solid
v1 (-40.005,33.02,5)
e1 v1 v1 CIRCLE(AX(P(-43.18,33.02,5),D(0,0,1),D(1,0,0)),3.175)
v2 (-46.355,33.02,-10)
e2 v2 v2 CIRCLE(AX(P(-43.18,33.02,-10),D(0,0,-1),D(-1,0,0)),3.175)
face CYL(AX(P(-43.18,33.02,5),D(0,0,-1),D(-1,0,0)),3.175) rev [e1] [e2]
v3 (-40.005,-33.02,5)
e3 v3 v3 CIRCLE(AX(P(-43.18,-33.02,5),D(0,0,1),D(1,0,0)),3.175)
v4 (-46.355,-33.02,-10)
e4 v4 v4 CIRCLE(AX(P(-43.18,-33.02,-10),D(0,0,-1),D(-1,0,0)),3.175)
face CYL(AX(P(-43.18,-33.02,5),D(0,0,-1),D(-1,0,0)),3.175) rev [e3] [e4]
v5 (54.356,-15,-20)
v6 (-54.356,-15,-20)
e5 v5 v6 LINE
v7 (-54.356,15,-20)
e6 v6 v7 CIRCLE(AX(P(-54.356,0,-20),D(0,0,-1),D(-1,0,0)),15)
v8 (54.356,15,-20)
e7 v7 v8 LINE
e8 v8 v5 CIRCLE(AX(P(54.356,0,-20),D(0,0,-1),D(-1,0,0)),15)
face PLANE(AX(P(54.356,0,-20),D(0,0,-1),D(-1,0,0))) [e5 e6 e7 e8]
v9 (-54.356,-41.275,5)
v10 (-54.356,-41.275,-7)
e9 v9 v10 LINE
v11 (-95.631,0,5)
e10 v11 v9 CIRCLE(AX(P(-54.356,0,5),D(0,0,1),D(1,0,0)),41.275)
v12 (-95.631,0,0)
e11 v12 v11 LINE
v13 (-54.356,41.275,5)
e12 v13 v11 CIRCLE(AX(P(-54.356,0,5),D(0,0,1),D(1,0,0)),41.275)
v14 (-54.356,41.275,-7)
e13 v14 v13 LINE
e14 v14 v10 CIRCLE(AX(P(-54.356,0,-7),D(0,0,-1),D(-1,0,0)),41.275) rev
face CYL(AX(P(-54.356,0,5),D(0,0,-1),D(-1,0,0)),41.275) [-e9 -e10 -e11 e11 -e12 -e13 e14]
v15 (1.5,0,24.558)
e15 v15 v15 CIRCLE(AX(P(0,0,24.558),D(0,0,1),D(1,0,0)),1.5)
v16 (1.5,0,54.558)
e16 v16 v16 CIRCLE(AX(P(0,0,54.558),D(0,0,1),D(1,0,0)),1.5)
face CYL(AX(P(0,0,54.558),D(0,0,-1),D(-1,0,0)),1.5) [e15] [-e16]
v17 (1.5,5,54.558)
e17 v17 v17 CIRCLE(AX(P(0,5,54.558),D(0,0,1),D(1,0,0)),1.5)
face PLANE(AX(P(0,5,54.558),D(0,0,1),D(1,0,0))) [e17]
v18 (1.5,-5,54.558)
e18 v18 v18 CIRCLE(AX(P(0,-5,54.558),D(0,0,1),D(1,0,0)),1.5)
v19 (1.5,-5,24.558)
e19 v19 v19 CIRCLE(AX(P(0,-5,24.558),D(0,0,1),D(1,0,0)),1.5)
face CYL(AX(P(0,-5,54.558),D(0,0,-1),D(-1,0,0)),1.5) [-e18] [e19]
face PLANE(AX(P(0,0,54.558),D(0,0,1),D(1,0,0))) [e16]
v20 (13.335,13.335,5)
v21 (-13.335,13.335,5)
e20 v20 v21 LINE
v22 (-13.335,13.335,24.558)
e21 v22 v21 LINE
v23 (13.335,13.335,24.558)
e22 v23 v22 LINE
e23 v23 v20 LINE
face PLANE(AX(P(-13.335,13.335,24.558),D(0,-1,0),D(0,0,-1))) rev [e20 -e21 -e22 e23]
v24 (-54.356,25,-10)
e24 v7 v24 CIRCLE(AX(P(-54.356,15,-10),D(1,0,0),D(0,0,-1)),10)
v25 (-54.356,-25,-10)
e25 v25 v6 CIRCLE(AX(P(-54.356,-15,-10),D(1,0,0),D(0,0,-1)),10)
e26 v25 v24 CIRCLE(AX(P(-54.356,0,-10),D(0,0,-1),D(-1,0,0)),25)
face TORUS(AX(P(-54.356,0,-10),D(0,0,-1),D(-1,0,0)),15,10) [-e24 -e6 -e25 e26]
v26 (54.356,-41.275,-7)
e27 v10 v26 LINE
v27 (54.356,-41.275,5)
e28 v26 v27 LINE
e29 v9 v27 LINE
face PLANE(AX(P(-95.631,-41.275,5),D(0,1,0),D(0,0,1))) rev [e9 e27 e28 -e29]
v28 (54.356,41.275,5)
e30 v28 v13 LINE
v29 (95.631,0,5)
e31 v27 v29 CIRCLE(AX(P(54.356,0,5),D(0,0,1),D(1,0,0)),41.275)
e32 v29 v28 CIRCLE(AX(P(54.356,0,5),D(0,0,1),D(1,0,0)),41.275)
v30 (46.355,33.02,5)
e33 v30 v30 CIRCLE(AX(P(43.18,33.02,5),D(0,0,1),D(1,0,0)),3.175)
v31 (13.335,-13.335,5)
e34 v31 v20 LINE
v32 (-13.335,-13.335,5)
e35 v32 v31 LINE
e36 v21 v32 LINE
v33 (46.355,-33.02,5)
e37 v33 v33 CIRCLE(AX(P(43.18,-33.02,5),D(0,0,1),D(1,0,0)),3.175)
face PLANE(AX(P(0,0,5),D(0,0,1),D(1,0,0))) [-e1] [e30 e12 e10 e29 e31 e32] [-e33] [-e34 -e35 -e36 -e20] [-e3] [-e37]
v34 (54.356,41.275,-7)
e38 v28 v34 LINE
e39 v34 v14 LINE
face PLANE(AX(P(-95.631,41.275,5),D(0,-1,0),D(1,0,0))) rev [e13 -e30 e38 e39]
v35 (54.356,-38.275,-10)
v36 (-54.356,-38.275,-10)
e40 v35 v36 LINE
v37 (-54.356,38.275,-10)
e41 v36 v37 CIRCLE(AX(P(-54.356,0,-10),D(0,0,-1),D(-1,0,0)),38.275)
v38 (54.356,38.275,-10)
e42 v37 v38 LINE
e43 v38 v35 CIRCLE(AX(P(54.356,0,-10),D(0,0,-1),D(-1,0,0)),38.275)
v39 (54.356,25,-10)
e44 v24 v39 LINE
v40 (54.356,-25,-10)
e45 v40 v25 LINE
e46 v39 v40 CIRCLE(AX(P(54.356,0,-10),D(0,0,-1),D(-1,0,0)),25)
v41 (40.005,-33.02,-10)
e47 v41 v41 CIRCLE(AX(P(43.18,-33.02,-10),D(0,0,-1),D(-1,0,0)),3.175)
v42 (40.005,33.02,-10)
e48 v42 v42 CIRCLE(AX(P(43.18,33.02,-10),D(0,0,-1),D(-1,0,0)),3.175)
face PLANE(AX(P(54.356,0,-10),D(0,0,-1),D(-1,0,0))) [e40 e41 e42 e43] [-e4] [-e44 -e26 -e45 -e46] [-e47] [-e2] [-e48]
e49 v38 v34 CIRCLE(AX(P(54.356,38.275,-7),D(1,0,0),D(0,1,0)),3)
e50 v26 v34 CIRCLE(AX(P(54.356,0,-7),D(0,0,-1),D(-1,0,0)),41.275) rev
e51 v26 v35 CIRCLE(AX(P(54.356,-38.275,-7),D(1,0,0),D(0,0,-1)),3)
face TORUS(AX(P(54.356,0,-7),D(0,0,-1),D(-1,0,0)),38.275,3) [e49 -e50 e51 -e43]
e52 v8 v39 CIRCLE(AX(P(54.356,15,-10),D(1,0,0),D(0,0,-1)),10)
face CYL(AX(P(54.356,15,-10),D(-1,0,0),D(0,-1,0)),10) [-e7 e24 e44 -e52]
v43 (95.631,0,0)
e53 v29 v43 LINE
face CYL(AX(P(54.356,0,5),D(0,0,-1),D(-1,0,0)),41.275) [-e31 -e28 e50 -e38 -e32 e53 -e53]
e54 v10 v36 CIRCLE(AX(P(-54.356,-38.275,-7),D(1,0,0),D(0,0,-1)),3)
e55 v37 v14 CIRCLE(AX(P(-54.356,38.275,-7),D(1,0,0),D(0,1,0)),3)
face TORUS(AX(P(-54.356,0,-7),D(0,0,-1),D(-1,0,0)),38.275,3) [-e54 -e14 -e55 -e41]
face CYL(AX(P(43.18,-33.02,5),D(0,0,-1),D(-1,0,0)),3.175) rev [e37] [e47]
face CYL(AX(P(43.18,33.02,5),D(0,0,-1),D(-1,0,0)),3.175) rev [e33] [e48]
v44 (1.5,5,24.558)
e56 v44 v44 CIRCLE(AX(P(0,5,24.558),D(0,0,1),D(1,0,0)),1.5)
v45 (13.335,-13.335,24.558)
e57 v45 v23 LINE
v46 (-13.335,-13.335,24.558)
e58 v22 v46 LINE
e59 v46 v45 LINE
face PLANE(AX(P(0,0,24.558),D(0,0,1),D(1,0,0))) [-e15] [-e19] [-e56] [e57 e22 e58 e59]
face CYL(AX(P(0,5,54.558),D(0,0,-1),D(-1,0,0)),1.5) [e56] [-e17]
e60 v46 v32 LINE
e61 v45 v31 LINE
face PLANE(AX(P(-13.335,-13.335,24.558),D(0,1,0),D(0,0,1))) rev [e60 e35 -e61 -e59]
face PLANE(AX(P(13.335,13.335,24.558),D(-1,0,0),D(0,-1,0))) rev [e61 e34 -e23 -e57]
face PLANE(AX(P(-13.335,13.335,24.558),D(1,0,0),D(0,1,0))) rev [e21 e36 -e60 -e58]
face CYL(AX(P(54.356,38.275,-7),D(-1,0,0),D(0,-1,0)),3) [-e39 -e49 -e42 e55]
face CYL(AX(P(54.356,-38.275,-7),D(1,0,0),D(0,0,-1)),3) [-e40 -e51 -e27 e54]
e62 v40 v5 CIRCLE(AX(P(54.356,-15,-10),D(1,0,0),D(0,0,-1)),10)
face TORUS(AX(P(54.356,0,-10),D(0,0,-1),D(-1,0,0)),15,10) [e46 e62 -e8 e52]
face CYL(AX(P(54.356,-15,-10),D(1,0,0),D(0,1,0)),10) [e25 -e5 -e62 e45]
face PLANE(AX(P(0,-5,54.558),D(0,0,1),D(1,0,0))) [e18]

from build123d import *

# Parameters (mm, degrees)
SKETCH1_W           = 191.262
SKETCH1_H           = 82.55
SKETCH1_R           = 3.175
BOSS_EXTRUDE1_DEPTH = 5
FILLET1_R           = 41.275
SKETCH2_W           = 26.67
SKETCH2_H           = 26.67
BOSS_EXTRUDE2_DEPTH = 19.558
SKETCH3_R           = 1.5
BOSS_EXTRUDE3_DEPTH = 30
BOSS_EXTRUDE4_START = 10
SKETCH4_R           = 3.175
BOSS_EXTRUDE4_DEPTH = 10
FILLET2_R           = 3
BOSS_EXTRUDE5_DEPTH = 10
FILLET3_R           = 10


with BuildPart() as part:
    # Sketch1 → Boss-Extrude1 (new body)
    with BuildSketch(Plane.XY):
        Rectangle(SKETCH1_W, SKETCH1_H)
        with Locations((-43.18, 33.02)):
            Circle(SKETCH1_R, mode=Mode.SUBTRACT)
        with Locations((43.18, 33.02)):
            Circle(SKETCH1_R, mode=Mode.SUBTRACT)
        with Locations((-43.18, -33.02)):
            Circle(SKETCH1_R, mode=Mode.SUBTRACT)
        with Locations((43.18, -33.02)):
            Circle(SKETCH1_R, mode=Mode.SUBTRACT)
    extrude(amount=BOSS_EXTRUDE1_DEPTH)

    # Fillet1
    fillet1_edges = [part.edges().sort_by_distance(p)[0] for p in [
        (-95.631, 41.275, 2.5),
        (95.631, 41.275, 2.5),
        (95.631, -41.275, 2.5),
        (-95.631, -41.275, 2.5),
    ]]
    fillet(fillet1_edges, radius=FILLET1_R - 0.0001)  # a hair under: the kernel refuses the full size

    # Sketch2 → Boss-Extrude2 (add)
    with BuildSketch(Plane.XY.offset(5)):
        Rectangle(SKETCH2_W, SKETCH2_H)
    extrude(amount=BOSS_EXTRUDE2_DEPTH)

    # Sketch3 → Boss-Extrude3 (add)
    with BuildSketch(Plane.XY.offset(24.558)):
        with Locations((0, 5)):
            Circle(SKETCH3_R)
        Circle(SKETCH3_R)
        with Locations((0, -5)):
            Circle(SKETCH3_R)
    extrude(amount=BOSS_EXTRUDE3_DEPTH)

    # Sketch4 → Boss-Extrude4 (add)
    with BuildSketch(Plane(origin=(0, 0, 0), x_dir=(-1, 0, 0), z_dir=(0, 0, -1)).offset(BOSS_EXTRUDE4_START)):
        with BuildLine():
            Line((-54.356, 41.275), (54.356, 41.275))
            ThreePointArc((54.356, 41.275), (95.631, 0), (54.356, -41.275))
            Line((54.356, -41.275), (-54.356, -41.275))
            ThreePointArc((-54.356, -41.275), (-95.631, 0), (-54.356, 41.275))
        make_face()
        with Locations((-43.18, 33.02)):
            Circle(SKETCH4_R, mode=Mode.SUBTRACT)
        with Locations((43.18, 33.02)):
            Circle(SKETCH4_R, mode=Mode.SUBTRACT)
        with Locations((43.18, -33.02)):
            Circle(SKETCH4_R, mode=Mode.SUBTRACT)
        with Locations((-43.18, -33.02)):
            Circle(SKETCH4_R, mode=Mode.SUBTRACT)
    extrude(amount=-BOSS_EXTRUDE4_DEPTH)

    # Fillet2
    fillet2_edges = [part.edges().sort_by_distance(p)[0] for p in [
        (95.631, 0, -10),
        (0, -41.275, -10),
        (-95.631, 0, -10),
        (0, 41.275, -10),
    ]]
    fillet(fillet2_edges, radius=FILLET2_R)

    # Sketch5 → Boss-Extrude5 (add)
    with BuildSketch(Plane(origin=(0, 0, -10), x_dir=(-1, 0, 0), z_dir=(0, 0, -1))):
        with BuildLine():
            Line((-54.356, 25), (54.356, 25))
            ThreePointArc((54.356, 25), (79.356, 0), (54.356, -25))
            Line((54.356, -25), (-54.356, -25))
            ThreePointArc((-54.356, -25), (-79.356, 0), (-54.356, 25))
        make_face()
    extrude(amount=BOSS_EXTRUDE5_DEPTH)

    # Fillet3
    fillet3_edges = [part.edges().sort_by_distance(p)[0] for p in [
        (79.356, 0, -20),
        (0, -25, -20),
        (-79.356, 0, -20),
        (0, 25, -20),
    ]]
    fillet(fillet3_edges, radius=FILLET3_R - 0.0001)  # a hair under: the kernel refuses the full size


solid = part.part
